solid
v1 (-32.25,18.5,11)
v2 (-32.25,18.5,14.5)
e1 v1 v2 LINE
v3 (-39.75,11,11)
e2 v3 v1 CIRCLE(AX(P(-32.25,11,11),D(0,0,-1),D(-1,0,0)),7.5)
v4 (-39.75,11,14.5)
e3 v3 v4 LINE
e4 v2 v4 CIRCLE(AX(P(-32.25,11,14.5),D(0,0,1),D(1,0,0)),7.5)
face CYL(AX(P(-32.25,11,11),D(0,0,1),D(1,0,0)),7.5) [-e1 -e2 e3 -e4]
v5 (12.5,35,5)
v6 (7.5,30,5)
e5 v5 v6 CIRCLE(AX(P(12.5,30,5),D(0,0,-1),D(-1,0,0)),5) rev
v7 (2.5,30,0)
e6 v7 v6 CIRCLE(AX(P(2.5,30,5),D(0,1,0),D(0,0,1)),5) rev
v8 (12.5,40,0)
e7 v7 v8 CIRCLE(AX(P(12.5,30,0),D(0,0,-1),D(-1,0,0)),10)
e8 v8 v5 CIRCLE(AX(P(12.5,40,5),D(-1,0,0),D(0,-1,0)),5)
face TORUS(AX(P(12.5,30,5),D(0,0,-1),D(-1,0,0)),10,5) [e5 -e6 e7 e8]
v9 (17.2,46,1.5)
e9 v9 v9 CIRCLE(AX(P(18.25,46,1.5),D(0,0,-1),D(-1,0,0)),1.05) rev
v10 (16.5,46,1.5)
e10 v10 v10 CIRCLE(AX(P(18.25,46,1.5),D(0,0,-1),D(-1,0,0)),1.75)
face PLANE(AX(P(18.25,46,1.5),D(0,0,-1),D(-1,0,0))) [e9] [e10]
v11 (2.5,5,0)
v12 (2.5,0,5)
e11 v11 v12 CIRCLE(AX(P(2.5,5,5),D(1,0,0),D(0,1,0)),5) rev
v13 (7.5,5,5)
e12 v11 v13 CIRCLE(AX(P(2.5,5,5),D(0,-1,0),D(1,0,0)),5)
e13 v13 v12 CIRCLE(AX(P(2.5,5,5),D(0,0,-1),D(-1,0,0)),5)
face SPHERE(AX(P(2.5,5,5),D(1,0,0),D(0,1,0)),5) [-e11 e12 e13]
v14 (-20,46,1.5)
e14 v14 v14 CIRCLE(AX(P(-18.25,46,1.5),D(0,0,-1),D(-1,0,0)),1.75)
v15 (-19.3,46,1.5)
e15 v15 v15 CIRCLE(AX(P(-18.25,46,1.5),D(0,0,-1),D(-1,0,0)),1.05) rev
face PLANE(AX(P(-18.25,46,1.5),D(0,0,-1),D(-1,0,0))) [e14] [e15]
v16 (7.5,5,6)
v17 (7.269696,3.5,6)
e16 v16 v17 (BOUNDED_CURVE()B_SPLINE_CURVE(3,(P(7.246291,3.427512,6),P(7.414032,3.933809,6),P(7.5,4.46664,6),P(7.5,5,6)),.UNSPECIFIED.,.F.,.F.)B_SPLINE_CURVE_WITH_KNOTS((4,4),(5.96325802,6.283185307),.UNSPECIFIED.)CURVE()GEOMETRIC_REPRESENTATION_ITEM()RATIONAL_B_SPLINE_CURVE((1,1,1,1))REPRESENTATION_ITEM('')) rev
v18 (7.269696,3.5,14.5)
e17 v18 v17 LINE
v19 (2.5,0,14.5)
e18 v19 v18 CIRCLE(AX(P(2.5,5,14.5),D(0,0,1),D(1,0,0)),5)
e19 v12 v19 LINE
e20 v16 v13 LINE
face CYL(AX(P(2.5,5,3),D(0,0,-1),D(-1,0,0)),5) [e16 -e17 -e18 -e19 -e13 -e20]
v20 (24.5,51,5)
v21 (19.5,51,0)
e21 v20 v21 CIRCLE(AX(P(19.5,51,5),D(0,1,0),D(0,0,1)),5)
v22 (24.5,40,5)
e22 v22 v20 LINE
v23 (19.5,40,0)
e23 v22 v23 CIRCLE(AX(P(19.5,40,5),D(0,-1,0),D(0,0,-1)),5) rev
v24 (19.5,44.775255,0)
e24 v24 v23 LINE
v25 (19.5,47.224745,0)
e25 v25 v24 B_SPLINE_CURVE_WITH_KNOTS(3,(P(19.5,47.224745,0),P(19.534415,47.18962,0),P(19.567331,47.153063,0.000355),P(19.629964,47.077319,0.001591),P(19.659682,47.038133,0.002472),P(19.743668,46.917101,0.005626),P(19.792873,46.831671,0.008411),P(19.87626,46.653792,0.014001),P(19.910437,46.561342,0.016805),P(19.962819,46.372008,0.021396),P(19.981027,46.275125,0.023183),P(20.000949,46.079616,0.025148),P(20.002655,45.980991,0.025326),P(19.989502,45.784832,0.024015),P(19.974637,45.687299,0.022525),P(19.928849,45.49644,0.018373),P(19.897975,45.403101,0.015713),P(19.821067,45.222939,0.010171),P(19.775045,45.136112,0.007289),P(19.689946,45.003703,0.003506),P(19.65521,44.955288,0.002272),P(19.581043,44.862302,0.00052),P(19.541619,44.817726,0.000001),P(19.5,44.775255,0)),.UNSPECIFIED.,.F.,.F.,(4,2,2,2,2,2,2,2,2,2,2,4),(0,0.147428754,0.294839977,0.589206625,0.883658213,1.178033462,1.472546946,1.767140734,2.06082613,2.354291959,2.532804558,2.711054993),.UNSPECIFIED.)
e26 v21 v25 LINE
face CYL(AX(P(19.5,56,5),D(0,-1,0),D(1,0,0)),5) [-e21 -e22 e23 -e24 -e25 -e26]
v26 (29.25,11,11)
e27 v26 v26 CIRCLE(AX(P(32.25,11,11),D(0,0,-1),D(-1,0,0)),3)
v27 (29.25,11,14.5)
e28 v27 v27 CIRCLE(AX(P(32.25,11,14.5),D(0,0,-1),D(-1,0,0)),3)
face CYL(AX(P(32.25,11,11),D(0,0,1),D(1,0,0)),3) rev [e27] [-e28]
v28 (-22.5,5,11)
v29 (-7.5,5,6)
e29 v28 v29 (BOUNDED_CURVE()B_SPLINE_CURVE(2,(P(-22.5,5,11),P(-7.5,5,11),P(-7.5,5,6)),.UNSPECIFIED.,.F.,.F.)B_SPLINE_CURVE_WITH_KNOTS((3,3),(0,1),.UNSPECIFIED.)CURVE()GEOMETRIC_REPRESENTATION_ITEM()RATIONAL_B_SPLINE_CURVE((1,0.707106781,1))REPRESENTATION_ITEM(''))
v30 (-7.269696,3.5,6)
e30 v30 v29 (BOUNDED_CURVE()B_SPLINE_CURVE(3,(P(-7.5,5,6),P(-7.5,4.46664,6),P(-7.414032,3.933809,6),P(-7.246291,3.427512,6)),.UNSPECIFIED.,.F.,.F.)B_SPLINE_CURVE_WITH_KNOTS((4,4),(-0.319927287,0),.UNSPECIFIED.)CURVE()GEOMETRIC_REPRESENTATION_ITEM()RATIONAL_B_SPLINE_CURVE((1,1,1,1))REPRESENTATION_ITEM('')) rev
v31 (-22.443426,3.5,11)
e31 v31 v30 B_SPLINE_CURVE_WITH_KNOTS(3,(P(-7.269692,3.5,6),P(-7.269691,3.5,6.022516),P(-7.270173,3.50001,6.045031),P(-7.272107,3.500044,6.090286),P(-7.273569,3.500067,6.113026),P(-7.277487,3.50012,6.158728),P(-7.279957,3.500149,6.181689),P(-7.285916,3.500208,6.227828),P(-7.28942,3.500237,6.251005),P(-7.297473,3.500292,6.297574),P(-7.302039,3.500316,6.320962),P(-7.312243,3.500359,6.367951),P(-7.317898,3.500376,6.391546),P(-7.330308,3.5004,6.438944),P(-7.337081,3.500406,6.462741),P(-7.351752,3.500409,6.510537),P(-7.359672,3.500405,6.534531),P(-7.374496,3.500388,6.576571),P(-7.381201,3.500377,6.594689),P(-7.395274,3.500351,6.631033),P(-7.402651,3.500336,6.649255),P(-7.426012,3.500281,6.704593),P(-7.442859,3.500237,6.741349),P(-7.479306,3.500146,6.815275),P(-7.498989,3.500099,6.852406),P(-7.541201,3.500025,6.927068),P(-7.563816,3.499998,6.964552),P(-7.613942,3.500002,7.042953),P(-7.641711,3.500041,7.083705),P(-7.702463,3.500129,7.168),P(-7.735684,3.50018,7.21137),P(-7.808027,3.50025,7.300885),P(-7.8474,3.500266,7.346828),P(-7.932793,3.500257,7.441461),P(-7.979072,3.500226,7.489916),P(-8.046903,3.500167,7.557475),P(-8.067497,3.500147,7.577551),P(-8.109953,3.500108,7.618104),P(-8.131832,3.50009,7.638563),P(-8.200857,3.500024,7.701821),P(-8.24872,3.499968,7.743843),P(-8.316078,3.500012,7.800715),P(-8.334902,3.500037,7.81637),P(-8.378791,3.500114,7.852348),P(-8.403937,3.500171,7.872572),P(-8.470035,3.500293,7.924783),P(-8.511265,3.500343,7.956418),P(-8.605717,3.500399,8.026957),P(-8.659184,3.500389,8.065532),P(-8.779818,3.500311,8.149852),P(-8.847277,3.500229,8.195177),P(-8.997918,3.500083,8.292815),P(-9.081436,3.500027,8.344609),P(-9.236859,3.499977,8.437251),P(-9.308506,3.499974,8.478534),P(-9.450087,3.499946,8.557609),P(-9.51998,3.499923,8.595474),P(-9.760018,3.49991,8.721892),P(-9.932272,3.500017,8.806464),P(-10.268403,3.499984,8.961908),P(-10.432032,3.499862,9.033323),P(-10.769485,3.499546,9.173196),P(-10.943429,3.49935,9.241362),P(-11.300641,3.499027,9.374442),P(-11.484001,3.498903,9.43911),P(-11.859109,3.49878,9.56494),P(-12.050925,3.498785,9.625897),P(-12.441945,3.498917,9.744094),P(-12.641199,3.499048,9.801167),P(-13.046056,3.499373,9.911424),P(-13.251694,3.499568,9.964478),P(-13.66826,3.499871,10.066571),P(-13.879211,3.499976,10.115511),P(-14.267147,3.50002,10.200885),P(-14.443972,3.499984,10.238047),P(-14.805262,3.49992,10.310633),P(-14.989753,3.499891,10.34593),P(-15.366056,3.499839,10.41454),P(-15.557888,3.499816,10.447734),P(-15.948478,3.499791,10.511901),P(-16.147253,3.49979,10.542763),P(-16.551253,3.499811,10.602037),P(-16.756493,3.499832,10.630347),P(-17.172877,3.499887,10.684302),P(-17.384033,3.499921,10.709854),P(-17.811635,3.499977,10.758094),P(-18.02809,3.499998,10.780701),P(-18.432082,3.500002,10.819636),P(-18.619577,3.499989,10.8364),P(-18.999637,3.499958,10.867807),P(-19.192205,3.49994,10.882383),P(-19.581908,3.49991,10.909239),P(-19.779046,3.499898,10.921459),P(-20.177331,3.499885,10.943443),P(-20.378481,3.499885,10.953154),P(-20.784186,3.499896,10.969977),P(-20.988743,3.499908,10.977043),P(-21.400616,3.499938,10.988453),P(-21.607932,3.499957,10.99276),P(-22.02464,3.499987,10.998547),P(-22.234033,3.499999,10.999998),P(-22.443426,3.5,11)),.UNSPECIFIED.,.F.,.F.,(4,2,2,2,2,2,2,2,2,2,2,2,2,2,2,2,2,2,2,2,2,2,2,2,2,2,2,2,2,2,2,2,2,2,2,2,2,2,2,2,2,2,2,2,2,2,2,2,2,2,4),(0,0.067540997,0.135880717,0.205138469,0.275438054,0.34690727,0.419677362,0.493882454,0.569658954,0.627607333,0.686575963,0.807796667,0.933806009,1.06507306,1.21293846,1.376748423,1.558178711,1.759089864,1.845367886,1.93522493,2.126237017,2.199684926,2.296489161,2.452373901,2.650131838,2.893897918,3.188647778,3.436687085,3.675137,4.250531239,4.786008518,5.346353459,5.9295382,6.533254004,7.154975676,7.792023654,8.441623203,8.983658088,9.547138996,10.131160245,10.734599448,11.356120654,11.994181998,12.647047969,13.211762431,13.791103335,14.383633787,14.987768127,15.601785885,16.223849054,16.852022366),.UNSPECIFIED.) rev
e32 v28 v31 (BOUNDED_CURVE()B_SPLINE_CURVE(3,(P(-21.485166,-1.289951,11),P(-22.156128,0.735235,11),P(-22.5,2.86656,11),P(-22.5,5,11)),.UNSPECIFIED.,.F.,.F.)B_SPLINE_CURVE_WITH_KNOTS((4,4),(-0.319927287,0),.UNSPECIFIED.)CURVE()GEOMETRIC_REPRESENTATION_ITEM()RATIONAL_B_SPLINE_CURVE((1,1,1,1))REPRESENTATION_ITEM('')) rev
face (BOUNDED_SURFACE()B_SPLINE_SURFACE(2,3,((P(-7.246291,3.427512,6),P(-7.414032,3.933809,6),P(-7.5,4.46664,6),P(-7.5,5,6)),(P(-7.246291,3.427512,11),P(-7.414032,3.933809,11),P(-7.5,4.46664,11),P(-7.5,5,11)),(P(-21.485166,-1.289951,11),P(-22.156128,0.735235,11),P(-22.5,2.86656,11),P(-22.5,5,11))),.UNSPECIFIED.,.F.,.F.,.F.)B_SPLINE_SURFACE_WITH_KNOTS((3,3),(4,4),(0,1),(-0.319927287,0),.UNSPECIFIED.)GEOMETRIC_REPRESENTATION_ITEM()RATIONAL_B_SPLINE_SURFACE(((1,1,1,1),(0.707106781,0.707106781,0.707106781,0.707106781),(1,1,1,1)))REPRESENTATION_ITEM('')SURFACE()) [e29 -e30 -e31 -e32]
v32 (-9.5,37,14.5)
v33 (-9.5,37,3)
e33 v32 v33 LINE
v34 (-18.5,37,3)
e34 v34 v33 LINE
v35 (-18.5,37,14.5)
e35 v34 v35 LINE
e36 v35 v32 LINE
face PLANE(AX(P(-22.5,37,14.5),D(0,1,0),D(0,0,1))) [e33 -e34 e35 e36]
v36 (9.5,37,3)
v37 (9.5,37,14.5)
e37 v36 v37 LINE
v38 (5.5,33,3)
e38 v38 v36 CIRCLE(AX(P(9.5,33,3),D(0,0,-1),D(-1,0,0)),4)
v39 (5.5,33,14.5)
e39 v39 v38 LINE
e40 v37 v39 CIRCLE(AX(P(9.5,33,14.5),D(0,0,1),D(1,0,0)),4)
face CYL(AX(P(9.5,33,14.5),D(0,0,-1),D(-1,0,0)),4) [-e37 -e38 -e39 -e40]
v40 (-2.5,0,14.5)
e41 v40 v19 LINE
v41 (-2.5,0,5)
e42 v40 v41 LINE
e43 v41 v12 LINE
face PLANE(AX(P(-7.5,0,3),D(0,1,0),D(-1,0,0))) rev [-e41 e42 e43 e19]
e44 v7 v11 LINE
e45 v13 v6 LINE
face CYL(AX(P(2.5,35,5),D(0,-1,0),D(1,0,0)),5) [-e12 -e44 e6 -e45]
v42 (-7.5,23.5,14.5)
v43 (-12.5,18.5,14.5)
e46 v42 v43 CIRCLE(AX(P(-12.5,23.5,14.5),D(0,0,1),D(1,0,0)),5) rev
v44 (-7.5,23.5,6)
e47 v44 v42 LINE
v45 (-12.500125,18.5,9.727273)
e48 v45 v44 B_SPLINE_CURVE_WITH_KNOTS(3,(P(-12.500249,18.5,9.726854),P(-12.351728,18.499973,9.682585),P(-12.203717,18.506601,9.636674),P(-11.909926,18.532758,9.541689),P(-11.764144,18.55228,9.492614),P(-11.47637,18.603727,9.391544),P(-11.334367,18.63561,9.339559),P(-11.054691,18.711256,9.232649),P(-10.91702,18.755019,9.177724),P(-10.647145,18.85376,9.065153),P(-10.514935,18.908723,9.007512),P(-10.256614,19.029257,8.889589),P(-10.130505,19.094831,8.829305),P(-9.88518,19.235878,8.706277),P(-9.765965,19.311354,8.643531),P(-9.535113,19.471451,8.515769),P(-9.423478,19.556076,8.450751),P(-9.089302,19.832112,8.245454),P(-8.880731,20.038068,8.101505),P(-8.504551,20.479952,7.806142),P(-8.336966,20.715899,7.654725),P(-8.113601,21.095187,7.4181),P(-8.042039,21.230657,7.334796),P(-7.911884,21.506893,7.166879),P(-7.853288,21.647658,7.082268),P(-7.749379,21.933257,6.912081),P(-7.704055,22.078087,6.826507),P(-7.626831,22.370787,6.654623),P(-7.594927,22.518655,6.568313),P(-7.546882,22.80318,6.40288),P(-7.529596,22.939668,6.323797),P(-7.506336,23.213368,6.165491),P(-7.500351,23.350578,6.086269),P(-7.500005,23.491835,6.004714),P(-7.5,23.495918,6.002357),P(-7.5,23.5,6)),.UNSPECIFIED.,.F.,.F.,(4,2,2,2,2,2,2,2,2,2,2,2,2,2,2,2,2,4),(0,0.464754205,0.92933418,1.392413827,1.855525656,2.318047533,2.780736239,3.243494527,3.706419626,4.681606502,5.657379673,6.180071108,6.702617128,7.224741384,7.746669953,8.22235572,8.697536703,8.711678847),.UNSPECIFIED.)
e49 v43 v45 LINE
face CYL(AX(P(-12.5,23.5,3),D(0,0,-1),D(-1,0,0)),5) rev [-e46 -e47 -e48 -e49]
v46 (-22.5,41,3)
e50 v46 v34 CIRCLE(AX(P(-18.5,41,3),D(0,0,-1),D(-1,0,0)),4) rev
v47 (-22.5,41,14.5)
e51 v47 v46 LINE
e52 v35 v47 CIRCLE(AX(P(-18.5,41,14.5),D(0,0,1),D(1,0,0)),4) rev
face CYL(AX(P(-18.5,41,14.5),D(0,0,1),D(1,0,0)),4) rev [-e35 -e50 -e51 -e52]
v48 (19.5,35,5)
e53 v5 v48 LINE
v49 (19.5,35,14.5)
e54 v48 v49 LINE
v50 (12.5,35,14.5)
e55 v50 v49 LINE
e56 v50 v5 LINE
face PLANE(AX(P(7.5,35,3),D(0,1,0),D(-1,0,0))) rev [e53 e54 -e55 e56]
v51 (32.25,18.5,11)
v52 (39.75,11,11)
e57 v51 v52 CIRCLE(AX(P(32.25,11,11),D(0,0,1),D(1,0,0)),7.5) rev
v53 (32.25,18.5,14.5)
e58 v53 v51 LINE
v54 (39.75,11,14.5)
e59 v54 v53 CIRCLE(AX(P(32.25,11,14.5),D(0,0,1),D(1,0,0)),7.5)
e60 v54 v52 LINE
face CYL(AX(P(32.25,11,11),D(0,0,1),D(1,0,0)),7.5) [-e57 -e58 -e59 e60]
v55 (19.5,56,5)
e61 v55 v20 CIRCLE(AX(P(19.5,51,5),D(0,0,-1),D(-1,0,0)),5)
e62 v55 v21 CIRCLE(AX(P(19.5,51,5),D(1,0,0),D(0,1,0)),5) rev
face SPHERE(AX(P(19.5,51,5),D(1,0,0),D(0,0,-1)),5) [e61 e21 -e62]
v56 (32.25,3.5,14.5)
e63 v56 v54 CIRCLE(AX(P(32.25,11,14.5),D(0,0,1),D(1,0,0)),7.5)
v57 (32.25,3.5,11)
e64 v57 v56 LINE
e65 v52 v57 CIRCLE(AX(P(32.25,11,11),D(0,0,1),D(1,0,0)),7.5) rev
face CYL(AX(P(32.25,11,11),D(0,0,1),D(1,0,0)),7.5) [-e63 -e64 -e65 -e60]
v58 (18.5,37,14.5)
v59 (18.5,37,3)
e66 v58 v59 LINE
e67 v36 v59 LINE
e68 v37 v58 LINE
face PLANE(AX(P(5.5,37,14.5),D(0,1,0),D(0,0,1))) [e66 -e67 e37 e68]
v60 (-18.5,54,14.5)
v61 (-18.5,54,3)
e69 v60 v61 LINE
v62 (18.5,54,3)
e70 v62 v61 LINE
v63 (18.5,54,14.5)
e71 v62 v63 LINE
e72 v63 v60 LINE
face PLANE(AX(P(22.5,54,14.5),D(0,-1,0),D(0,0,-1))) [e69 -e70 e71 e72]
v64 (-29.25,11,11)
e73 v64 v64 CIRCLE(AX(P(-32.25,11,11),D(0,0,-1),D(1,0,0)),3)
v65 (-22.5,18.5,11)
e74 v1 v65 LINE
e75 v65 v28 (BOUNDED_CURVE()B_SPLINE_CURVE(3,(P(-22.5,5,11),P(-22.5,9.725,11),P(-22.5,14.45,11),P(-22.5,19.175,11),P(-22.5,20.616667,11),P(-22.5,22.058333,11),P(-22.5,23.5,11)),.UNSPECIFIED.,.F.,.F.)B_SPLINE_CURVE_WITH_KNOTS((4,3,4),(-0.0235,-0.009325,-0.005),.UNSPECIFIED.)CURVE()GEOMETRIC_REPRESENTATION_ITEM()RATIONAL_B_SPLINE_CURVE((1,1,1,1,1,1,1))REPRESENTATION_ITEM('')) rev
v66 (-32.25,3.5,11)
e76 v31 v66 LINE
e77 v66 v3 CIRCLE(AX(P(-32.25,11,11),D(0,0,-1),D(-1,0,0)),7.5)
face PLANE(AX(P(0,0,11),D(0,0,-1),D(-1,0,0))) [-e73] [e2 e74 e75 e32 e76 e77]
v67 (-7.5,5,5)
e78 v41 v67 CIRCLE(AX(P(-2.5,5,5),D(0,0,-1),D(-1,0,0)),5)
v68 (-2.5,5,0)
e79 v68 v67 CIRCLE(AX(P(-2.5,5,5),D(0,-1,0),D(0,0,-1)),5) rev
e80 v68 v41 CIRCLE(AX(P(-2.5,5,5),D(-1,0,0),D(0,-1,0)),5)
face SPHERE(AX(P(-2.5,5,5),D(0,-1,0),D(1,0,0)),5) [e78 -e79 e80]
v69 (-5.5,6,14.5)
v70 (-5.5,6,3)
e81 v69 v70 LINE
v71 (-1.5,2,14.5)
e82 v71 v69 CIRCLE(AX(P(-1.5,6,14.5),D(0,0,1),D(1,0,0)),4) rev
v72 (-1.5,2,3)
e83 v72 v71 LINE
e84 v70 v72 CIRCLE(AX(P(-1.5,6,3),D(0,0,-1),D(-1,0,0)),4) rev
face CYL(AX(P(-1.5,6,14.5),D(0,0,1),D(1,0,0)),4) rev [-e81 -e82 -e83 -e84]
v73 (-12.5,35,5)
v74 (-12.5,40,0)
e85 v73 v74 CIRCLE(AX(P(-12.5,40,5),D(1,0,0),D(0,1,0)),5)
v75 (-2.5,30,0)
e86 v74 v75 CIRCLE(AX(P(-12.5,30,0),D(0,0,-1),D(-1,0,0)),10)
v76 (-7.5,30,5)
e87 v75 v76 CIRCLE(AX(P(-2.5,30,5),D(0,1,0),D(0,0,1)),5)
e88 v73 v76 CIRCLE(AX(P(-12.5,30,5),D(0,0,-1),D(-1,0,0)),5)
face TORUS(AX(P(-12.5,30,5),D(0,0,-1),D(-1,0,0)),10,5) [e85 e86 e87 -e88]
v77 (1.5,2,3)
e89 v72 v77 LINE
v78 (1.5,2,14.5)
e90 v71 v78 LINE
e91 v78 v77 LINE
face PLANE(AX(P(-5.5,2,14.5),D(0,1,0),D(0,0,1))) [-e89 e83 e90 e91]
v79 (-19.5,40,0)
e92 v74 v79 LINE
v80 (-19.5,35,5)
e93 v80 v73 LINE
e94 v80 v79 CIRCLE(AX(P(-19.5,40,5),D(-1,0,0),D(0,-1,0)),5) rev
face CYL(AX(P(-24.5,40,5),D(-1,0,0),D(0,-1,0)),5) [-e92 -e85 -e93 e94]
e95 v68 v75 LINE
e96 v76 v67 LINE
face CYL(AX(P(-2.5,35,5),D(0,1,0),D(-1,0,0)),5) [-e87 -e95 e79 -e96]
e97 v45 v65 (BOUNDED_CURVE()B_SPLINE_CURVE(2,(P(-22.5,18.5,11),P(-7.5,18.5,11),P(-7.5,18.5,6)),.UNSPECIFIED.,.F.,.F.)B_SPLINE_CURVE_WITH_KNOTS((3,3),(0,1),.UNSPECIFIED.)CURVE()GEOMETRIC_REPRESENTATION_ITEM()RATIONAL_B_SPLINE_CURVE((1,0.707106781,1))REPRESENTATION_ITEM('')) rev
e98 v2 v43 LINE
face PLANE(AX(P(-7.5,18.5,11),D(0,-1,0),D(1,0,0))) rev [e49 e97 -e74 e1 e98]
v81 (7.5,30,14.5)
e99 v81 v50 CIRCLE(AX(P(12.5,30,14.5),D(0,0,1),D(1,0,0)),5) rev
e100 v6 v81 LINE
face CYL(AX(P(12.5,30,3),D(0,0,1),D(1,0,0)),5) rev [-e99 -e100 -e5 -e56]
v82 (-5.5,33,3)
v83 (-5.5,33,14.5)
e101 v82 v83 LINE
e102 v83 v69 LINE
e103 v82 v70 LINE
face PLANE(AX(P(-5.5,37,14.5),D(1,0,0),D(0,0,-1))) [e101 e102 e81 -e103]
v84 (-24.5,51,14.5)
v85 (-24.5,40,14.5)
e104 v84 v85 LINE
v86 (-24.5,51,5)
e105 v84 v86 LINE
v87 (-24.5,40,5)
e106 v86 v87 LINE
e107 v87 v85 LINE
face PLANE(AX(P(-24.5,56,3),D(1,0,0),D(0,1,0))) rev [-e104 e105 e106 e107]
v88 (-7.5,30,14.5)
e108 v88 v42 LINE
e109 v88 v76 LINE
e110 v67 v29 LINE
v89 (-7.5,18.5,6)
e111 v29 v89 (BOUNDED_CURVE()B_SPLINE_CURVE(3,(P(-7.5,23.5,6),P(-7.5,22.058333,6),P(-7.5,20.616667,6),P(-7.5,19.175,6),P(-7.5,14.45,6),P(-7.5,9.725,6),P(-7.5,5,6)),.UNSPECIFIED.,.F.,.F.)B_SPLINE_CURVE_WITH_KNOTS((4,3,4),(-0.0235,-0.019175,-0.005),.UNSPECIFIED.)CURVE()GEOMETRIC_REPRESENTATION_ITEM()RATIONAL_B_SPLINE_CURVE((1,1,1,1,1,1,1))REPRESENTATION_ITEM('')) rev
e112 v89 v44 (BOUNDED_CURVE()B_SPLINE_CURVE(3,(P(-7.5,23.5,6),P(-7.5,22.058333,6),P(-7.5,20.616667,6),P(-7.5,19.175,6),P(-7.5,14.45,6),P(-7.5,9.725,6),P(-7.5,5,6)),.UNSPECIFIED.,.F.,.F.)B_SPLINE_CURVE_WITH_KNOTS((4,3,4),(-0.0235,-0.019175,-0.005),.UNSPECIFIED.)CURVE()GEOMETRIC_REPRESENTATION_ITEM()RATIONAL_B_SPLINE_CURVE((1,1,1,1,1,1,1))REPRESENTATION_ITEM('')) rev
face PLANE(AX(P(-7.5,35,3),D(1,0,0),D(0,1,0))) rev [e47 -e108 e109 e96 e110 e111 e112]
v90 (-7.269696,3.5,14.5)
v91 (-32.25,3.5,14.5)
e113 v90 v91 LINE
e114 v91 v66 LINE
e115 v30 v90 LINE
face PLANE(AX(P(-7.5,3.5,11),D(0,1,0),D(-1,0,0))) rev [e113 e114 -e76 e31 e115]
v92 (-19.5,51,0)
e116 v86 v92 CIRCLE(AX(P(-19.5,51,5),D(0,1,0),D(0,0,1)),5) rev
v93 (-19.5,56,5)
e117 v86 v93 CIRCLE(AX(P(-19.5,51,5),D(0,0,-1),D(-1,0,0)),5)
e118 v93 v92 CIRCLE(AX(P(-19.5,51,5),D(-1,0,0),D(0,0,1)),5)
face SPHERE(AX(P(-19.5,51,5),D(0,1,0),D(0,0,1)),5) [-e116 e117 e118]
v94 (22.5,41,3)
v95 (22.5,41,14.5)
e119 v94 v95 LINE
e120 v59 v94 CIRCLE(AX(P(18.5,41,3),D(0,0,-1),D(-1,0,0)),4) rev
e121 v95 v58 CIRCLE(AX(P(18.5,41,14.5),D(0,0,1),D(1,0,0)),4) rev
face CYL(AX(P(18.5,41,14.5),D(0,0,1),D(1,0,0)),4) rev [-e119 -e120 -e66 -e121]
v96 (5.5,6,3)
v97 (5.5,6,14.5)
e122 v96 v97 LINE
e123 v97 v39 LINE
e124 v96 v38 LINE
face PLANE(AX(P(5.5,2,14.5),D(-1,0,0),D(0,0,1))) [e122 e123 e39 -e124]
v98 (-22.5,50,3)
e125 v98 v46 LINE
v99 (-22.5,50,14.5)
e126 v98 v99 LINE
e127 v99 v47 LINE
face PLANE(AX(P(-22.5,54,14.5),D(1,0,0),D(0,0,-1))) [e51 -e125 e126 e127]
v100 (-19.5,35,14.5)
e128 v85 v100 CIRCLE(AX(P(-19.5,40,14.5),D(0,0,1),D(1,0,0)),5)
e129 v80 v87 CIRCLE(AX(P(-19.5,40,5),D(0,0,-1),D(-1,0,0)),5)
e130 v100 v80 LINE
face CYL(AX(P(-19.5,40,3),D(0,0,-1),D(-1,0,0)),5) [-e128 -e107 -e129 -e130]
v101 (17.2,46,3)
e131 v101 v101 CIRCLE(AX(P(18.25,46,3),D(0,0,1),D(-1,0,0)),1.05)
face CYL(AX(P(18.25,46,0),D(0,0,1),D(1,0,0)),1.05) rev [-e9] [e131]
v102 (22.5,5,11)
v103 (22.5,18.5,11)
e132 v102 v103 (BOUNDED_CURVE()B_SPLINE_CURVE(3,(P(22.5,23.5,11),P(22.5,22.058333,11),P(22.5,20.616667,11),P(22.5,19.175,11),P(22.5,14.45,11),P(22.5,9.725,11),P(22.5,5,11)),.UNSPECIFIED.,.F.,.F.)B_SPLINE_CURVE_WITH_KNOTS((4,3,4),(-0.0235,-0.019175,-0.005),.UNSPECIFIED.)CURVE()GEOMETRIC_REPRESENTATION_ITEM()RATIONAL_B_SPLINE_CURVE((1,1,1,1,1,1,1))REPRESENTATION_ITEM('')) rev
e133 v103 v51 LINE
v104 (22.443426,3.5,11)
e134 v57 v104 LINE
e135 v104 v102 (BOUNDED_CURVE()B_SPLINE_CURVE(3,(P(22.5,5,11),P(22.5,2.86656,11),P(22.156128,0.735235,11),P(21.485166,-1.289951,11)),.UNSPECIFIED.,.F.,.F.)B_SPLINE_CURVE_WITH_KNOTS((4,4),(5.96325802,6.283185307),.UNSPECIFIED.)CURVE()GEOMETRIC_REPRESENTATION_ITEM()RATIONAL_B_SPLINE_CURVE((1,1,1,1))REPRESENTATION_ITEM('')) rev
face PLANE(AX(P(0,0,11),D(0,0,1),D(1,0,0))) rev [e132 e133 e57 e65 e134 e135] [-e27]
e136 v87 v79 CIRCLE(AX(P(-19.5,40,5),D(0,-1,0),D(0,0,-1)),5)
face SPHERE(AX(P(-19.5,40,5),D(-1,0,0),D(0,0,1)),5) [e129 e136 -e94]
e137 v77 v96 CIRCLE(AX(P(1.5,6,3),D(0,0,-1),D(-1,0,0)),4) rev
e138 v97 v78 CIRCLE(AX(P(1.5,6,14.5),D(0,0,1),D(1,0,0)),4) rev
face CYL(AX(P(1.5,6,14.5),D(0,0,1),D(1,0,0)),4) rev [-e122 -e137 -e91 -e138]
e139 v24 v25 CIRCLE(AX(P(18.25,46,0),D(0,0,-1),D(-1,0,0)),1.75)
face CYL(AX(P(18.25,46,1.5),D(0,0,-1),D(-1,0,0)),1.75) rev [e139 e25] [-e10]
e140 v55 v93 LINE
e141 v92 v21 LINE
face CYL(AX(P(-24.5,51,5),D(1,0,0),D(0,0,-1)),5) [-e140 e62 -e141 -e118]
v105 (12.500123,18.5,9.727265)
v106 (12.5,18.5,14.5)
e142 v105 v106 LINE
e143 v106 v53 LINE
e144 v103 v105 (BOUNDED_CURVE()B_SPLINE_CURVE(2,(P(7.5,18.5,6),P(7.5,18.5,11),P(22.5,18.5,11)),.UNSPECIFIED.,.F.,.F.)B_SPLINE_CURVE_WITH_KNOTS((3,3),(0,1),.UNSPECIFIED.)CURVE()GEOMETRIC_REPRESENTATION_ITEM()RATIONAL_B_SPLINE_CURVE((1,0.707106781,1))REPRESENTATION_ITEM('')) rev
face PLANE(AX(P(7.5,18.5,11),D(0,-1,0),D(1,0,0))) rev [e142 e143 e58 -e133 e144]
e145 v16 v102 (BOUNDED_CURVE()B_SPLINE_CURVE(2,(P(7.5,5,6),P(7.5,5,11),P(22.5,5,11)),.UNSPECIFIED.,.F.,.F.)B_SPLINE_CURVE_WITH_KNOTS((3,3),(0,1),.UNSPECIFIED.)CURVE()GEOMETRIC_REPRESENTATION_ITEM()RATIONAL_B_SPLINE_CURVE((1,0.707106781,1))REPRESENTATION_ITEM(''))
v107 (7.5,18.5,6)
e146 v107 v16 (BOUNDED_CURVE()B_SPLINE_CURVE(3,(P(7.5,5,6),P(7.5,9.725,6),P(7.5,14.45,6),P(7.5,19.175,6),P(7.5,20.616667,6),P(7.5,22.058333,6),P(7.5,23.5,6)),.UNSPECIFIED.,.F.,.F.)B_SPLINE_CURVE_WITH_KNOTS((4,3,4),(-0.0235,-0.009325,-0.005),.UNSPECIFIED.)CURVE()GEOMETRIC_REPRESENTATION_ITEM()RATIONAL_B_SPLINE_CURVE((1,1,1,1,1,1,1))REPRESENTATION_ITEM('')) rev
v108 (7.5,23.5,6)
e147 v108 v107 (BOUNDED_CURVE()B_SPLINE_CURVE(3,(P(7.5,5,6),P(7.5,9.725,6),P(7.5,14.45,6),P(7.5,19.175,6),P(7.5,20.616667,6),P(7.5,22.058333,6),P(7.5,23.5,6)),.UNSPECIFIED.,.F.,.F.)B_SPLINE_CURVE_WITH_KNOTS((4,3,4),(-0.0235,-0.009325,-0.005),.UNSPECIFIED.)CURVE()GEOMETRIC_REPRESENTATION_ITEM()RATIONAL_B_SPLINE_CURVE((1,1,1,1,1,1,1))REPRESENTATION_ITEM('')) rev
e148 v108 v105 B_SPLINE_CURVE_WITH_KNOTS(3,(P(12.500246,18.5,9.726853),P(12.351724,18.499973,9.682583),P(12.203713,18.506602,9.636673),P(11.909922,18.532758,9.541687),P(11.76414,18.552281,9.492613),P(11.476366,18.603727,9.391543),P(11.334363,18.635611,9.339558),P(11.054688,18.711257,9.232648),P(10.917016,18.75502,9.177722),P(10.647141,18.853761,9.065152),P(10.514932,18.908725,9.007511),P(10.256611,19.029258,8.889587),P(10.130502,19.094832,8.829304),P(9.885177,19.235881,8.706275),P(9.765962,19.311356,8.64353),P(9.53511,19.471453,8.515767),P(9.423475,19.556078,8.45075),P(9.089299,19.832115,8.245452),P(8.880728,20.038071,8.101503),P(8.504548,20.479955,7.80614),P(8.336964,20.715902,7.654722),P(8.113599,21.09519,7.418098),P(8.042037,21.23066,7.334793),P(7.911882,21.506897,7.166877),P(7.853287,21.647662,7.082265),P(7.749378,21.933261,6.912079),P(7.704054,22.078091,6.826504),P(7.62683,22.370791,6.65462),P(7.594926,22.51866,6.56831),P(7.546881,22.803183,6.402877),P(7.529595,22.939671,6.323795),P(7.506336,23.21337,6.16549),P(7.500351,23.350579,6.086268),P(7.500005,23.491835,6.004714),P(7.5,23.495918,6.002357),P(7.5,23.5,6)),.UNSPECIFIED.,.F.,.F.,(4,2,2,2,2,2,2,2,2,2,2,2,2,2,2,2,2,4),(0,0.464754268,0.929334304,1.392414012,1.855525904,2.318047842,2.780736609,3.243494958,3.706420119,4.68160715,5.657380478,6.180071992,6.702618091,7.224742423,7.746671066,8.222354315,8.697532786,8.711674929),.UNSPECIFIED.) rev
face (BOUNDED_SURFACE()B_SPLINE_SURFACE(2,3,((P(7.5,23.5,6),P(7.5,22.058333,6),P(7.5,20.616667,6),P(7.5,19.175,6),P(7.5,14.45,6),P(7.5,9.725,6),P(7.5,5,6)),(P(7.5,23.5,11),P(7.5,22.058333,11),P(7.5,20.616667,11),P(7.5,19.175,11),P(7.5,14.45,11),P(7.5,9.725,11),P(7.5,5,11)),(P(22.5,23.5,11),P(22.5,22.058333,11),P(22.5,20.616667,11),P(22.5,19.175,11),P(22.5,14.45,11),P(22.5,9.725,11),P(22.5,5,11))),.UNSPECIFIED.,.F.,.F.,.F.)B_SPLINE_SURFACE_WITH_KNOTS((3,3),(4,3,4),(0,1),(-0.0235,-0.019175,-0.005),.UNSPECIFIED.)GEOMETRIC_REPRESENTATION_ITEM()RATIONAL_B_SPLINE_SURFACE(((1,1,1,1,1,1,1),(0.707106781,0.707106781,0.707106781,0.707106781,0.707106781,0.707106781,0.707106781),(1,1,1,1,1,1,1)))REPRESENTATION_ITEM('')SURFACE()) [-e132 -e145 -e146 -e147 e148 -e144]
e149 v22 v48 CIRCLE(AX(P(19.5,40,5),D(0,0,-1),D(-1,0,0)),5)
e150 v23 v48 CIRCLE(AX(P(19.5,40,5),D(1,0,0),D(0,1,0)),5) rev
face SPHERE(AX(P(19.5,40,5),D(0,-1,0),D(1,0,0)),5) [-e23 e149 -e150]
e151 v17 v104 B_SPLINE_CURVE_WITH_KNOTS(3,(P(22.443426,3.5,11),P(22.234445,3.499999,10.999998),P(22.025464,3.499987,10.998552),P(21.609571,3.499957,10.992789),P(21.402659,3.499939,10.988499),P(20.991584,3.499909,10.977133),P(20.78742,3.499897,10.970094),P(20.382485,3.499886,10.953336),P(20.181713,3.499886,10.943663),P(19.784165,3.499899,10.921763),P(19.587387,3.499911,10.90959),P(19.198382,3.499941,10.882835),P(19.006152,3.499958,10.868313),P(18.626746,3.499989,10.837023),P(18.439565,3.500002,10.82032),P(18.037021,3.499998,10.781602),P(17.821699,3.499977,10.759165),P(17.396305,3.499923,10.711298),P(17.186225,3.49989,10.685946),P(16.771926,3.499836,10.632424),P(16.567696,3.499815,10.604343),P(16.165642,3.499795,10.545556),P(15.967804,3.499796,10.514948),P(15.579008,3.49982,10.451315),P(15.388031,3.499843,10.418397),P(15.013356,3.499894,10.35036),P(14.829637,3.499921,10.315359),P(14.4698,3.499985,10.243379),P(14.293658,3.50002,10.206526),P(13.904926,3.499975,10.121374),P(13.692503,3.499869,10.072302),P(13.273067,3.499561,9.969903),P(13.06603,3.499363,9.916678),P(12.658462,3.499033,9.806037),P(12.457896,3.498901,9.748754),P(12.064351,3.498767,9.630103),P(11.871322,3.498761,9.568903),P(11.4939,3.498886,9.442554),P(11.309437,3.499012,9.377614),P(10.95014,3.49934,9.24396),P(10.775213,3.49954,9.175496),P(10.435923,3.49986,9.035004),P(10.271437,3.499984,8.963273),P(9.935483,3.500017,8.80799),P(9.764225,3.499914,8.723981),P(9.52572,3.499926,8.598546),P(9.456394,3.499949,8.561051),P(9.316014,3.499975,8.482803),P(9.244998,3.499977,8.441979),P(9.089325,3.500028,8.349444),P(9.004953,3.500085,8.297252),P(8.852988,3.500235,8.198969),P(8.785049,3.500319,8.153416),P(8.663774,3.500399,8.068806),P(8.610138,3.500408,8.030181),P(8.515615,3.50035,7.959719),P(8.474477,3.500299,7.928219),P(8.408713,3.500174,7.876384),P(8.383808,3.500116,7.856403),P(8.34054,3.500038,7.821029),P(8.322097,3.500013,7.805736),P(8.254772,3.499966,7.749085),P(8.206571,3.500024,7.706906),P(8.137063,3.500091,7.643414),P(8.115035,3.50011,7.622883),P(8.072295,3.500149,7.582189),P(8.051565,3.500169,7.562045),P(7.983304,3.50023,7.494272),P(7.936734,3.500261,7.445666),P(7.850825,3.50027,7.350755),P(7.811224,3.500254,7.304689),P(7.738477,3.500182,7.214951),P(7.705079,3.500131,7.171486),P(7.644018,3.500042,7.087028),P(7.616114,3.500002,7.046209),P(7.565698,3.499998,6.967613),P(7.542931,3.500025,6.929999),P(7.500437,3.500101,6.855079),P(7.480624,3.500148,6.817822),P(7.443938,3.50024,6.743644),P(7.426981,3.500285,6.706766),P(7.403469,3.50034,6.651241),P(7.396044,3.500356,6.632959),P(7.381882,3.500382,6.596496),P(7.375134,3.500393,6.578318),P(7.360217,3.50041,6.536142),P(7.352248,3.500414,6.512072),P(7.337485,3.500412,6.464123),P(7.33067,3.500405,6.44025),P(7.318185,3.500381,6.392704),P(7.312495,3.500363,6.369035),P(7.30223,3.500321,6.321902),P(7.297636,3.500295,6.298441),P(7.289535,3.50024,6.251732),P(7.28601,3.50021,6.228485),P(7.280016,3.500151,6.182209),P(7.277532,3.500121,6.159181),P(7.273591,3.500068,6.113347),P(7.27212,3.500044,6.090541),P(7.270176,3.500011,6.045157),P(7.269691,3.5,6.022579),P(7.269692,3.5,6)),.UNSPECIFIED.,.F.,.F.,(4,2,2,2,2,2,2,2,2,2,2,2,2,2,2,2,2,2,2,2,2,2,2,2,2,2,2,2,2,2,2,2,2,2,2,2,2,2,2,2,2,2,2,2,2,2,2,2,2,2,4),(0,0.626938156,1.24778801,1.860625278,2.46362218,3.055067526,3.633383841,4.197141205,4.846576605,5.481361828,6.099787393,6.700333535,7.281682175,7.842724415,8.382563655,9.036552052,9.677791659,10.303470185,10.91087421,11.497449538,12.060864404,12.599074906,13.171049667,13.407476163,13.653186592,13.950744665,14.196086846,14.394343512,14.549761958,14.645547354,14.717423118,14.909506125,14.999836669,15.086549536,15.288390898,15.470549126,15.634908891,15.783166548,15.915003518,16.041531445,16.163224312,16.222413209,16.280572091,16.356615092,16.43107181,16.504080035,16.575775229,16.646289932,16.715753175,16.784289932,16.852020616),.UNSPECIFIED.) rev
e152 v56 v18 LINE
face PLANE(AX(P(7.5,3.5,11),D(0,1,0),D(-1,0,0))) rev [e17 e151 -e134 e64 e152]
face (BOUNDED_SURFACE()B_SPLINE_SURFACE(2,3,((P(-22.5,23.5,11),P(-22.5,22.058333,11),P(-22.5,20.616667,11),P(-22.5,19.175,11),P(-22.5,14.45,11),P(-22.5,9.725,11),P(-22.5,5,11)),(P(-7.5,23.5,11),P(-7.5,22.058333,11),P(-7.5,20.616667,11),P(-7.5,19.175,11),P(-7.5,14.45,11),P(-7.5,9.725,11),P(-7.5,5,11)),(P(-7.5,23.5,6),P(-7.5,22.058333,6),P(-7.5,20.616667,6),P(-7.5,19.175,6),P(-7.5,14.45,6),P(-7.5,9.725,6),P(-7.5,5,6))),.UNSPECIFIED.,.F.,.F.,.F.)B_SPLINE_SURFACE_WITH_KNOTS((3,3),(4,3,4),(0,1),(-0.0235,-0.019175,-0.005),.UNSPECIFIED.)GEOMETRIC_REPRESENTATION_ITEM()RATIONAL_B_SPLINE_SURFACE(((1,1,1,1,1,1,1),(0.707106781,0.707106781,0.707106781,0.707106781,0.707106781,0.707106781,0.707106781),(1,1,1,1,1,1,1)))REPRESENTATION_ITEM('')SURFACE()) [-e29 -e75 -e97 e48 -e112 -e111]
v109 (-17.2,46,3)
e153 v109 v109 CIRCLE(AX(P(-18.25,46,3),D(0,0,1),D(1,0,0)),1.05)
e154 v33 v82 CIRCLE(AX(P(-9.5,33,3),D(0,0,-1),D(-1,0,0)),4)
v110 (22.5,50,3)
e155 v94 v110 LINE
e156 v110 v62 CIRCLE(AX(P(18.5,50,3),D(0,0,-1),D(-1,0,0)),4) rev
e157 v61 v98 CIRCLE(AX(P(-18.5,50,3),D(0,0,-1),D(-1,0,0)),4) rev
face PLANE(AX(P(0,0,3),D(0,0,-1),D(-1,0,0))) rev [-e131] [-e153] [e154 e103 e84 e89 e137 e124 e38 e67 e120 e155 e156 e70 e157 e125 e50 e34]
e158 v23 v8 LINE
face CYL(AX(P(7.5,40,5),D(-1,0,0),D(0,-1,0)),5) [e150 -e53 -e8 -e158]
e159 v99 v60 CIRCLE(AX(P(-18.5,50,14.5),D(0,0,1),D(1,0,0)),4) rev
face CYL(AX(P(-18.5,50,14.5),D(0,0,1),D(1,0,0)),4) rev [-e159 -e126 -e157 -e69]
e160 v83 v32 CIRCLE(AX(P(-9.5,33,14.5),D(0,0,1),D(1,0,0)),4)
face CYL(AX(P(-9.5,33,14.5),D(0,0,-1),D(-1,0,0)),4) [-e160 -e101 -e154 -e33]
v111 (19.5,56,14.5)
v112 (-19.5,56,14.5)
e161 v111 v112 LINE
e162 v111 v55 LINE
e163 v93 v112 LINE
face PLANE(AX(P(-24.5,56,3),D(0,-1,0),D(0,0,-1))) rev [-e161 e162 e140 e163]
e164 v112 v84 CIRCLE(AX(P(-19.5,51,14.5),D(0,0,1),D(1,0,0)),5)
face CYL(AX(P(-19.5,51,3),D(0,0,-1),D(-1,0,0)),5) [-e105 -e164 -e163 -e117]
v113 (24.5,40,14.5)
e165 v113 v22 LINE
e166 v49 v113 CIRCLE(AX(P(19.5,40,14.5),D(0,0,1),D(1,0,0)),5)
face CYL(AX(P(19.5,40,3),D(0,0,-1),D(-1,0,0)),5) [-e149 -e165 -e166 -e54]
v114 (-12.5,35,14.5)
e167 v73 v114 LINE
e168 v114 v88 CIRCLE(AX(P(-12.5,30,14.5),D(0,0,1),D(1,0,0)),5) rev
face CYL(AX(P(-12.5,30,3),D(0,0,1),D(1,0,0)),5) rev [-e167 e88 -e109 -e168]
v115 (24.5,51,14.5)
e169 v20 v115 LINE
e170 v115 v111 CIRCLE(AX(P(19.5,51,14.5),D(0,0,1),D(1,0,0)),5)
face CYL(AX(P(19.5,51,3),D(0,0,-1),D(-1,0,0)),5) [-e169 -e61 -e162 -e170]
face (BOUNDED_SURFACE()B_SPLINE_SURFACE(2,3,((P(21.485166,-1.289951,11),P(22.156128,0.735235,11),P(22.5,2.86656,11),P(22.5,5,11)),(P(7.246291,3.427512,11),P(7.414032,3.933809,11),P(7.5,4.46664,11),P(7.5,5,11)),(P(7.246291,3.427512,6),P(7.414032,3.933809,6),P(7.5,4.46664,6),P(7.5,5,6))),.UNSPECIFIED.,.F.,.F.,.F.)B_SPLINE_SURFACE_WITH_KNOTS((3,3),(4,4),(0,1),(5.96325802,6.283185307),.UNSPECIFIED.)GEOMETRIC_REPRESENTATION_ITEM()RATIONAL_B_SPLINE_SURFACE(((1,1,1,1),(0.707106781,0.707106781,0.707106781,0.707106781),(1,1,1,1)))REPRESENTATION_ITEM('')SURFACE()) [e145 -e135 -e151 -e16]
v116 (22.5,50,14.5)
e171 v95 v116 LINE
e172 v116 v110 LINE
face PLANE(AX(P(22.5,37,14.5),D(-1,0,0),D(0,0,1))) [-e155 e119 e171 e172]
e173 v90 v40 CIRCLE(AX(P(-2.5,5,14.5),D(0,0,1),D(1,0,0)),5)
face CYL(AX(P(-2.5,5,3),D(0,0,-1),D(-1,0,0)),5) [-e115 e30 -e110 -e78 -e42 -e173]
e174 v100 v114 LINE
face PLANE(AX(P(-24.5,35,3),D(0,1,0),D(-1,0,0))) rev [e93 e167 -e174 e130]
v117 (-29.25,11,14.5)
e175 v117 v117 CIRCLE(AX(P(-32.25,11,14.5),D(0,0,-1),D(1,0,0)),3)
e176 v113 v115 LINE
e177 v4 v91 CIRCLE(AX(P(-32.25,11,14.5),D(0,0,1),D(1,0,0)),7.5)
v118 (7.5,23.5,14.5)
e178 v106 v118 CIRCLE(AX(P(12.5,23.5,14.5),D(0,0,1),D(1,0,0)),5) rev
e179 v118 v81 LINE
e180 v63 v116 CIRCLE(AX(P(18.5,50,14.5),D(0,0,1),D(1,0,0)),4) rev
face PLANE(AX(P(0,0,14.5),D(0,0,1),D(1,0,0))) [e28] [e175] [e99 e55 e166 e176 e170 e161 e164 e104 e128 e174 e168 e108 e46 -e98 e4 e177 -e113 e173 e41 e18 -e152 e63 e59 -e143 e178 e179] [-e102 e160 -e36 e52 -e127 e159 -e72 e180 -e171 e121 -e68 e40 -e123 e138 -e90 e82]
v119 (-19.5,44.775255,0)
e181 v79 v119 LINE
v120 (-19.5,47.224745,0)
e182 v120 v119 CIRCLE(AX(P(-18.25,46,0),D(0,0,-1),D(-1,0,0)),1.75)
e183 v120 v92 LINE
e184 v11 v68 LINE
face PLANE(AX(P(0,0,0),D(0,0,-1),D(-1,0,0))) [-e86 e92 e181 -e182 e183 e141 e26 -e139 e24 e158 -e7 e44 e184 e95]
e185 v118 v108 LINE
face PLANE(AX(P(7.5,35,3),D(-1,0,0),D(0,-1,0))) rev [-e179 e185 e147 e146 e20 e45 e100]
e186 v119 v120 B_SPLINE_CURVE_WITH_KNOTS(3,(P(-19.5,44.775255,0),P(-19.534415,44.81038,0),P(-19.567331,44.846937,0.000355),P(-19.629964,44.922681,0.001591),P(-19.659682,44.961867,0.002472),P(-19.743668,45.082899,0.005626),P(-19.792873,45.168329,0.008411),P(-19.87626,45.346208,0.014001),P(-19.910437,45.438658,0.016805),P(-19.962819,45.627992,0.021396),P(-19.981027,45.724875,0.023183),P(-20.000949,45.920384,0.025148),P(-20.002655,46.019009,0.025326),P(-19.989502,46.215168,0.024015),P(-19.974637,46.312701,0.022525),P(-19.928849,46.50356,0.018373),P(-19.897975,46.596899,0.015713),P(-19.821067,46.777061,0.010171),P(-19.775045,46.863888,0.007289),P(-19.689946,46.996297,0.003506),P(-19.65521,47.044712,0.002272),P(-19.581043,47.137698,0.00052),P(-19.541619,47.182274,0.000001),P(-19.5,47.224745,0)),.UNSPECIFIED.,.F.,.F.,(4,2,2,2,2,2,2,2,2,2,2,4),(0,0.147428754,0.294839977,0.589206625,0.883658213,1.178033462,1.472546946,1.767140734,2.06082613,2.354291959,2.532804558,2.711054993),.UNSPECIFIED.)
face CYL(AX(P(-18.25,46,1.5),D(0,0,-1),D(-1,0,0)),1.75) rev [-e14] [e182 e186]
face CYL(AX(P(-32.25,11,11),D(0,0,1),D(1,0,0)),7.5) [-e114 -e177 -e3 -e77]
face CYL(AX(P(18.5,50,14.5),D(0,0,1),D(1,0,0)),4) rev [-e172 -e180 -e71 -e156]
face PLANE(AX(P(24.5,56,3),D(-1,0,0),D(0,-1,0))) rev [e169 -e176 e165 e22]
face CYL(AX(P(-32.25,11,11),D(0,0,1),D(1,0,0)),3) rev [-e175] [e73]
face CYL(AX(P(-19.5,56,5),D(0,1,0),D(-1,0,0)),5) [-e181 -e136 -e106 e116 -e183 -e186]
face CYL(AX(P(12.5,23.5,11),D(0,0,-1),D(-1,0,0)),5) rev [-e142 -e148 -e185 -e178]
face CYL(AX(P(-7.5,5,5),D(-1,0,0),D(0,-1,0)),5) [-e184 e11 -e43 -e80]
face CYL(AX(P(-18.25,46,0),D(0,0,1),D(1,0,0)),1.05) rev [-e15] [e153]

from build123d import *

# Parameters (mm, degrees)
BOSS_EXTRUDE1_DEPTH = 3
BOSS_EXTRUDE5_DEPTH = 11.5
SKETCH7_W           = 32.25
SKETCH7_H           = 15
SKETCH7_R           = 3
BOSS_EXTRUDE6_DEPTH = 3.5
FILLET4_R           = 4
FILLET5_R           = 5
FILLET6_SIZE        = 5
FILLET6_SIZE_2      = 15
FILLET7_START       = 5.9999999
FILLET7_DEPTH       = 8.5000001
FILLET7_START_2     = 18.5
FILLET7_2_DEPTH     = 5.5
FILLET8_R           = 7.5
SKETCH9_R           = 1.05
CUT_EXTRUDE2_DEPTH  = 70.629824804
SKETCH10_R          = 1.75
CUT_EXTRUDE3_DEPTH  = 1.5


with BuildPart() as part:
    # Sketch1 → Boss-Extrude1 (new body)
    with BuildSketch(Plane.XY):
        Polygon((7.5, 35), (24.5, 35), (24.5, 56), (-24.5, 56), (-24.5, 35), (-7.5, 35), (-7.5, 0), (7.5, 0), align=None)
    extrude(amount=BOSS_EXTRUDE1_DEPTH)

    # Sketch6 → Boss-Extrude5 (add)
    with BuildSketch(Plane.XY.offset(3)):
        Polygon((-24.5, 35), (-7.5, 35), (-7.5, 0), (7.5, 0), (7.5, 35), (24.5, 35), (24.5, 56), (-24.5, 56), align=None)
        Polygon((-22.5, 37), (-5.5, 37), (-5.5, 2), (5.5, 2), (5.5, 37), (22.5, 37), (22.5, 54), (-22.5, 54), align=None, mode=Mode.SUBTRACT)
    extrude(amount=BOSS_EXTRUDE5_DEPTH)

    # Sketch7 → Boss-Extrude6 (add)
    # profile 1 of 2: a face of its own
    with BuildSketch(Plane(origin=(0, 0, 14.5), x_dir=(-1, 0, 0), z_dir=(0, 0, -1))):
        with Locations((-23.625, 11)):
            Rectangle(SKETCH7_W, SKETCH7_H)
        with Locations((-32.25, 11)):
            Circle(SKETCH7_R, mode=Mode.SUBTRACT)
    # profile 2 of 2: a face of its own
    with BuildSketch(Plane(origin=(0, 0, 14.5), x_dir=(-1, 0, 0), z_dir=(0, 0, -1))):
        with Locations((23.625, 11)):
            Rectangle(SKETCH7_W, SKETCH7_H)
        with Locations(Location((32.25, 11, 0), (0, 0, 180))):
            Circle(SKETCH7_R, mode=Mode.SUBTRACT)
    extrude(amount=BOSS_EXTRUDE6_DEPTH)

    # Fillet4
    fillet4_edges = [part.edges().sort_by_distance(p)[0] for p in [
        (-22.5, 37, 8.75),
        (-5.5, 37, 8.75),
        (-5.5, 2, 8.75),
        (5.5, 2, 8.75),
        (5.5, 37, 8.75),
        (22.5, 37, 8.75),
        (22.5, 54, 8.75),
        (-22.5, 54, 8.75),
    ]]
    fillet(fillet4_edges, radius=FILLET4_R)

    # Fillet5
    fillet5_edges = [part.edges().sort_by_distance(p)[0] for p in [
        (-7.5, 35, 7.25),
        (7.5, 35, 7.25),
        (-7.5, 0, 7.25),
        (7.5, 0, 7.25),
        (0, 0, 0),
        (7.5, 17.5, 0),
        (-7.5, 17.5, 0),
        (-16, 35, 0),
        (16, 35, 0),
        (-24.5, 45.5, 0),
        (24.5, 45.5, 0),
        (0, 56, 0),
        (24.5, 35, 7.25),
        (24.5, 56, 7.25),
        (-24.5, 35, 7.25),
        (-24.5, 56, 7.25),
    ]]
    fillet(fillet5_edges, radius=FILLET5_R)

    # Fillet6
    # a fillet whose section is not a circle: 15, 5 mm, written as the material it adds along each edge
    with BuildSketch(Plane(origin=(-2.5, 5, 11), x_dir=(-1, 0, 0), z_dir=(0, 1, 0))) as fillet6_piece_1_section:
        with BuildLine():
            Bezier((5, -FILLET6_SIZE), (5, 0), (5 + FILLET6_SIZE_2, 0), weights=[1, 0.707106781, 1])
            Line((5 + FILLET6_SIZE_2, 0), (5, 0))
            Line((5, 0), (5, -FILLET6_SIZE))
        make_face()
    fillet6_piece_1 = revolve(axis=Axis((-2.5, 5, 11), (0, 0, 1)), revolution_arc=359.64, mode=Mode.PRIVATE)
    fillet6_piece_1 = split(fillet6_piece_1, bisect_by=Plane(origin=(-2.5, 18.5, 11), z_dir=(0, -1, 0)), keep=Keep.TOP, mode=Mode.PRIVATE)
    fillet6_piece_1 = split(fillet6_piece_1, bisect_by=Plane(origin=(-2.5, 3.5, 11), z_dir=(0, 1, 0)), keep=Keep.TOP, mode=Mode.PRIVATE)
    fillet6_piece_1 = split(fillet6_piece_1, bisect_by=Plane(origin=(-5.5, 5, 11), z_dir=(-1, 0, 0)), keep=Keep.TOP, mode=Mode.PRIVATE)
    add(fillet6_piece_1)
    with BuildSketch(Plane(origin=(-2.5, 5, 11), x_dir=(-1, 0, 0), z_dir=(0, 1, 0))) as fillet6_piece_2_section:
        with BuildLine():
            Bezier((5, -FILLET6_SIZE), (5, 0), (5 + FILLET6_SIZE_2, 0), weights=[1, 0.707106781, 1])
            Line((5 + FILLET6_SIZE_2, 0), (5, 0))
            Line((5, 0), (5, -FILLET6_SIZE))
        make_face()
    fillet6_piece_2 = revolve(axis=Axis((-2.5, 5, 11), (0, 0, 1)), revolution_arc=359.64, mode=Mode.PRIVATE)
    fillet6_piece_2 = split(fillet6_piece_2, bisect_by=Plane(origin=(-2.5, 18.5, 11), z_dir=(0, -1, 0)), keep=Keep.TOP, mode=Mode.PRIVATE)
    fillet6_piece_2 = split(fillet6_piece_2, bisect_by=Plane(origin=(-2.5, 3.5, 11), z_dir=(0, 1, 0)), keep=Keep.TOP, mode=Mode.PRIVATE)
    fillet6_piece_2 = split(fillet6_piece_2, bisect_by=Plane(origin=(5.5, 5, 11), z_dir=(1, 0, 0)), keep=Keep.TOP, mode=Mode.PRIVATE)
    add(fillet6_piece_2)
    with BuildSketch(Plane(origin=(-7.5, 18.5, 11), x_dir=(0, 0, -1), z_dir=(0, -1, 0)), Plane(origin=(7.5, 5, 11), x_dir=(0, 0, -1), z_dir=(0, 1, 0))) as fillet6_piece_3:
        with BuildLine():
            Bezier((FILLET6_SIZE, 0), (0, 0), (0, -FILLET6_SIZE_2), weights=[1, 0.707106781, 1])
            Line((0, -FILLET6_SIZE_2), (0, 0))
            Line((0, 0), (FILLET6_SIZE, 0))
        make_face()
    extrude(amount=13.5)
    with BuildSketch(Plane(origin=(2.5, 5, 11), x_dir=(0.9999802608561371, 0.006283143965559468, 0), z_dir=(0.006283143965559468, -0.9999802608561371, 0))) as fillet6_piece_4_section:
        with BuildLine():
            Bezier((5, -FILLET6_SIZE), (5, 0), (5 + FILLET6_SIZE_2, 0), weights=[1, 0.707106781, 1])
            Line((5 + FILLET6_SIZE_2, 0), (5, 0))
            Line((5, 0), (5, -FILLET6_SIZE))
        make_face()
    fillet6_piece_4 = revolve(axis=Axis((2.5, 5, 11), (0, 0, 1)), revolution_arc=359.64, mode=Mode.PRIVATE)
    fillet6_piece_4 = split(fillet6_piece_4, bisect_by=Plane(origin=(2.5, 18.5, 11), z_dir=(0, -1, 0)), keep=Keep.TOP, mode=Mode.PRIVATE)
    fillet6_piece_4 = split(fillet6_piece_4, bisect_by=Plane(origin=(2.5, 3.5, 11), z_dir=(0, 1, 0)), keep=Keep.TOP, mode=Mode.PRIVATE)
    fillet6_piece_4 = split(fillet6_piece_4, bisect_by=Plane(origin=(5.5, 5, 11), z_dir=(1, 0, 0)), keep=Keep.TOP, mode=Mode.PRIVATE)
    add(fillet6_piece_4)
    with BuildSketch(Plane(origin=(2.5, 5, 11), x_dir=(0.9999802608561371, 0.006283143965559468, 0), z_dir=(0.006283143965559468, -0.9999802608561371, 0))) as fillet6_piece_5_section:
        with BuildLine():
            Bezier((5, -FILLET6_SIZE), (5, 0), (5 + FILLET6_SIZE_2, 0), weights=[1, 0.707106781, 1])
            Line((5 + FILLET6_SIZE_2, 0), (5, 0))
            Line((5, 0), (5, -FILLET6_SIZE))
        make_face()
    fillet6_piece_5 = revolve(axis=Axis((2.5, 5, 11), (0, 0, 1)), revolution_arc=359.64, mode=Mode.PRIVATE)
    fillet6_piece_5 = split(fillet6_piece_5, bisect_by=Plane(origin=(2.5, 18.5, 11), z_dir=(0, -1, 0)), keep=Keep.TOP, mode=Mode.PRIVATE)
    fillet6_piece_5 = split(fillet6_piece_5, bisect_by=Plane(origin=(2.5, 3.5, 11), z_dir=(0, 1, 0)), keep=Keep.TOP, mode=Mode.PRIVATE)
    fillet6_piece_5 = split(fillet6_piece_5, bisect_by=Plane(origin=(-5.5, 5, 11), z_dir=(-1, 0, 0)), keep=Keep.TOP, mode=Mode.PRIVATE)
    add(fillet6_piece_5)

    # Fillet7: read off the stored shape, not the designer's step
    # Fillet7 outline → Fillet7 (add)
    with BuildSketch(Plane.XY.offset(FILLET7_START)):
        with BuildLine():
            Line((-7.5, 18.5), (-7.5, 23.5))
            ThreePointArc((-7.5, 23.5), (-8.964554264, 19.964377926), (-12.500249379, 18.500000006))
            Line((-12.500249379, 18.500000006), (-7.5, 18.5))
        make_face()
        with BuildLine():
            Line((7.5, 18.5), (12.500245622, 18.500000006))
            ThreePointArc((12.500245622, 18.500000006), (8.964552936, 19.964379255), (7.5, 23.5))
            Line((7.5, 23.5), (7.5, 18.5))
        make_face()
    extrude(amount=FILLET7_DEPTH)

    # Fillet7 2 outline → Fillet7 2 (cut)
    with BuildSketch(Plane(origin=(0, 0, 0), x_dir=(1, 0, 0), z_dir=(0, 1, 0)).offset(FILLET7_START_2)):
        with BuildLine():
            Line((-14, -5.9999999), (-14, -10.119735698))
            add(Edge.make_bspline(
                [(-14, -10.119735698), (-7.5, -8.629618531), (-7.5, -6)],
                knots=[0.389274824, 0.389274824, 0.389274824, 1, 1, 1], degree=2, weights=[0.86073517, 0.821122737, 1]))
            Line((-7.5, -6), (-14, -5.9999999))
        make_face()
        with BuildLine():
            add(Edge.make_bspline(
                [(7.5, -6), (7.5, -8.629618531), (14, -10.119735698)],
                knots=[0, 0, 0, 0.610725176, 0.610725176, 0.610725176], degree=2, weights=[1, 0.821122737, 0.86073517]))
            Line((14, -10.119735698), (14, -5.9999999))
            Line((14, -5.9999999), (7.5, -6))
        make_face()
    extrude(amount=FILLET7_2_DEPTH, mode=Mode.SUBTRACT)

    # Fillet8
    fillet8_edges = [part.edges().sort_by_distance(p)[0] for p in [
        (-39.75, 18.5, 12.75),
        (-39.75, 3.5, 12.75),
        (39.75, 18.5, 12.75),
        (39.75, 3.5, 12.75),
    ]]
    fillet(fillet8_edges, radius=FILLET8_R - 0.0001)  # a hair under: the kernel refuses the full size

    # Sketch9 → Cut-Extrude2 (cut, through all)
    with BuildSketch(Plane.XY.offset(3)):
        with Locations((-18.25, 46)):
            Circle(SKETCH9_R)
        with Locations(Location((18.25, 46, 0), (0, 0, 180))):
            Circle(SKETCH9_R)
    extrude(amount=-CUT_EXTRUDE2_DEPTH, mode=Mode.SUBTRACT)

    # Sketch10 → Cut-Extrude3 (cut)
    with BuildSketch(Plane(origin=(0, 0, 0), x_dir=(-1, 0, 0), z_dir=(0, 0, -1))):
        with Locations((-18.25, 46)):
            Circle(SKETCH10_R)
        with Locations((18.25, 46)):
            Circle(SKETCH10_R)
    extrude(amount=-CUT_EXTRUDE3_DEPTH, mode=Mode.SUBTRACT)


solid = part.part
